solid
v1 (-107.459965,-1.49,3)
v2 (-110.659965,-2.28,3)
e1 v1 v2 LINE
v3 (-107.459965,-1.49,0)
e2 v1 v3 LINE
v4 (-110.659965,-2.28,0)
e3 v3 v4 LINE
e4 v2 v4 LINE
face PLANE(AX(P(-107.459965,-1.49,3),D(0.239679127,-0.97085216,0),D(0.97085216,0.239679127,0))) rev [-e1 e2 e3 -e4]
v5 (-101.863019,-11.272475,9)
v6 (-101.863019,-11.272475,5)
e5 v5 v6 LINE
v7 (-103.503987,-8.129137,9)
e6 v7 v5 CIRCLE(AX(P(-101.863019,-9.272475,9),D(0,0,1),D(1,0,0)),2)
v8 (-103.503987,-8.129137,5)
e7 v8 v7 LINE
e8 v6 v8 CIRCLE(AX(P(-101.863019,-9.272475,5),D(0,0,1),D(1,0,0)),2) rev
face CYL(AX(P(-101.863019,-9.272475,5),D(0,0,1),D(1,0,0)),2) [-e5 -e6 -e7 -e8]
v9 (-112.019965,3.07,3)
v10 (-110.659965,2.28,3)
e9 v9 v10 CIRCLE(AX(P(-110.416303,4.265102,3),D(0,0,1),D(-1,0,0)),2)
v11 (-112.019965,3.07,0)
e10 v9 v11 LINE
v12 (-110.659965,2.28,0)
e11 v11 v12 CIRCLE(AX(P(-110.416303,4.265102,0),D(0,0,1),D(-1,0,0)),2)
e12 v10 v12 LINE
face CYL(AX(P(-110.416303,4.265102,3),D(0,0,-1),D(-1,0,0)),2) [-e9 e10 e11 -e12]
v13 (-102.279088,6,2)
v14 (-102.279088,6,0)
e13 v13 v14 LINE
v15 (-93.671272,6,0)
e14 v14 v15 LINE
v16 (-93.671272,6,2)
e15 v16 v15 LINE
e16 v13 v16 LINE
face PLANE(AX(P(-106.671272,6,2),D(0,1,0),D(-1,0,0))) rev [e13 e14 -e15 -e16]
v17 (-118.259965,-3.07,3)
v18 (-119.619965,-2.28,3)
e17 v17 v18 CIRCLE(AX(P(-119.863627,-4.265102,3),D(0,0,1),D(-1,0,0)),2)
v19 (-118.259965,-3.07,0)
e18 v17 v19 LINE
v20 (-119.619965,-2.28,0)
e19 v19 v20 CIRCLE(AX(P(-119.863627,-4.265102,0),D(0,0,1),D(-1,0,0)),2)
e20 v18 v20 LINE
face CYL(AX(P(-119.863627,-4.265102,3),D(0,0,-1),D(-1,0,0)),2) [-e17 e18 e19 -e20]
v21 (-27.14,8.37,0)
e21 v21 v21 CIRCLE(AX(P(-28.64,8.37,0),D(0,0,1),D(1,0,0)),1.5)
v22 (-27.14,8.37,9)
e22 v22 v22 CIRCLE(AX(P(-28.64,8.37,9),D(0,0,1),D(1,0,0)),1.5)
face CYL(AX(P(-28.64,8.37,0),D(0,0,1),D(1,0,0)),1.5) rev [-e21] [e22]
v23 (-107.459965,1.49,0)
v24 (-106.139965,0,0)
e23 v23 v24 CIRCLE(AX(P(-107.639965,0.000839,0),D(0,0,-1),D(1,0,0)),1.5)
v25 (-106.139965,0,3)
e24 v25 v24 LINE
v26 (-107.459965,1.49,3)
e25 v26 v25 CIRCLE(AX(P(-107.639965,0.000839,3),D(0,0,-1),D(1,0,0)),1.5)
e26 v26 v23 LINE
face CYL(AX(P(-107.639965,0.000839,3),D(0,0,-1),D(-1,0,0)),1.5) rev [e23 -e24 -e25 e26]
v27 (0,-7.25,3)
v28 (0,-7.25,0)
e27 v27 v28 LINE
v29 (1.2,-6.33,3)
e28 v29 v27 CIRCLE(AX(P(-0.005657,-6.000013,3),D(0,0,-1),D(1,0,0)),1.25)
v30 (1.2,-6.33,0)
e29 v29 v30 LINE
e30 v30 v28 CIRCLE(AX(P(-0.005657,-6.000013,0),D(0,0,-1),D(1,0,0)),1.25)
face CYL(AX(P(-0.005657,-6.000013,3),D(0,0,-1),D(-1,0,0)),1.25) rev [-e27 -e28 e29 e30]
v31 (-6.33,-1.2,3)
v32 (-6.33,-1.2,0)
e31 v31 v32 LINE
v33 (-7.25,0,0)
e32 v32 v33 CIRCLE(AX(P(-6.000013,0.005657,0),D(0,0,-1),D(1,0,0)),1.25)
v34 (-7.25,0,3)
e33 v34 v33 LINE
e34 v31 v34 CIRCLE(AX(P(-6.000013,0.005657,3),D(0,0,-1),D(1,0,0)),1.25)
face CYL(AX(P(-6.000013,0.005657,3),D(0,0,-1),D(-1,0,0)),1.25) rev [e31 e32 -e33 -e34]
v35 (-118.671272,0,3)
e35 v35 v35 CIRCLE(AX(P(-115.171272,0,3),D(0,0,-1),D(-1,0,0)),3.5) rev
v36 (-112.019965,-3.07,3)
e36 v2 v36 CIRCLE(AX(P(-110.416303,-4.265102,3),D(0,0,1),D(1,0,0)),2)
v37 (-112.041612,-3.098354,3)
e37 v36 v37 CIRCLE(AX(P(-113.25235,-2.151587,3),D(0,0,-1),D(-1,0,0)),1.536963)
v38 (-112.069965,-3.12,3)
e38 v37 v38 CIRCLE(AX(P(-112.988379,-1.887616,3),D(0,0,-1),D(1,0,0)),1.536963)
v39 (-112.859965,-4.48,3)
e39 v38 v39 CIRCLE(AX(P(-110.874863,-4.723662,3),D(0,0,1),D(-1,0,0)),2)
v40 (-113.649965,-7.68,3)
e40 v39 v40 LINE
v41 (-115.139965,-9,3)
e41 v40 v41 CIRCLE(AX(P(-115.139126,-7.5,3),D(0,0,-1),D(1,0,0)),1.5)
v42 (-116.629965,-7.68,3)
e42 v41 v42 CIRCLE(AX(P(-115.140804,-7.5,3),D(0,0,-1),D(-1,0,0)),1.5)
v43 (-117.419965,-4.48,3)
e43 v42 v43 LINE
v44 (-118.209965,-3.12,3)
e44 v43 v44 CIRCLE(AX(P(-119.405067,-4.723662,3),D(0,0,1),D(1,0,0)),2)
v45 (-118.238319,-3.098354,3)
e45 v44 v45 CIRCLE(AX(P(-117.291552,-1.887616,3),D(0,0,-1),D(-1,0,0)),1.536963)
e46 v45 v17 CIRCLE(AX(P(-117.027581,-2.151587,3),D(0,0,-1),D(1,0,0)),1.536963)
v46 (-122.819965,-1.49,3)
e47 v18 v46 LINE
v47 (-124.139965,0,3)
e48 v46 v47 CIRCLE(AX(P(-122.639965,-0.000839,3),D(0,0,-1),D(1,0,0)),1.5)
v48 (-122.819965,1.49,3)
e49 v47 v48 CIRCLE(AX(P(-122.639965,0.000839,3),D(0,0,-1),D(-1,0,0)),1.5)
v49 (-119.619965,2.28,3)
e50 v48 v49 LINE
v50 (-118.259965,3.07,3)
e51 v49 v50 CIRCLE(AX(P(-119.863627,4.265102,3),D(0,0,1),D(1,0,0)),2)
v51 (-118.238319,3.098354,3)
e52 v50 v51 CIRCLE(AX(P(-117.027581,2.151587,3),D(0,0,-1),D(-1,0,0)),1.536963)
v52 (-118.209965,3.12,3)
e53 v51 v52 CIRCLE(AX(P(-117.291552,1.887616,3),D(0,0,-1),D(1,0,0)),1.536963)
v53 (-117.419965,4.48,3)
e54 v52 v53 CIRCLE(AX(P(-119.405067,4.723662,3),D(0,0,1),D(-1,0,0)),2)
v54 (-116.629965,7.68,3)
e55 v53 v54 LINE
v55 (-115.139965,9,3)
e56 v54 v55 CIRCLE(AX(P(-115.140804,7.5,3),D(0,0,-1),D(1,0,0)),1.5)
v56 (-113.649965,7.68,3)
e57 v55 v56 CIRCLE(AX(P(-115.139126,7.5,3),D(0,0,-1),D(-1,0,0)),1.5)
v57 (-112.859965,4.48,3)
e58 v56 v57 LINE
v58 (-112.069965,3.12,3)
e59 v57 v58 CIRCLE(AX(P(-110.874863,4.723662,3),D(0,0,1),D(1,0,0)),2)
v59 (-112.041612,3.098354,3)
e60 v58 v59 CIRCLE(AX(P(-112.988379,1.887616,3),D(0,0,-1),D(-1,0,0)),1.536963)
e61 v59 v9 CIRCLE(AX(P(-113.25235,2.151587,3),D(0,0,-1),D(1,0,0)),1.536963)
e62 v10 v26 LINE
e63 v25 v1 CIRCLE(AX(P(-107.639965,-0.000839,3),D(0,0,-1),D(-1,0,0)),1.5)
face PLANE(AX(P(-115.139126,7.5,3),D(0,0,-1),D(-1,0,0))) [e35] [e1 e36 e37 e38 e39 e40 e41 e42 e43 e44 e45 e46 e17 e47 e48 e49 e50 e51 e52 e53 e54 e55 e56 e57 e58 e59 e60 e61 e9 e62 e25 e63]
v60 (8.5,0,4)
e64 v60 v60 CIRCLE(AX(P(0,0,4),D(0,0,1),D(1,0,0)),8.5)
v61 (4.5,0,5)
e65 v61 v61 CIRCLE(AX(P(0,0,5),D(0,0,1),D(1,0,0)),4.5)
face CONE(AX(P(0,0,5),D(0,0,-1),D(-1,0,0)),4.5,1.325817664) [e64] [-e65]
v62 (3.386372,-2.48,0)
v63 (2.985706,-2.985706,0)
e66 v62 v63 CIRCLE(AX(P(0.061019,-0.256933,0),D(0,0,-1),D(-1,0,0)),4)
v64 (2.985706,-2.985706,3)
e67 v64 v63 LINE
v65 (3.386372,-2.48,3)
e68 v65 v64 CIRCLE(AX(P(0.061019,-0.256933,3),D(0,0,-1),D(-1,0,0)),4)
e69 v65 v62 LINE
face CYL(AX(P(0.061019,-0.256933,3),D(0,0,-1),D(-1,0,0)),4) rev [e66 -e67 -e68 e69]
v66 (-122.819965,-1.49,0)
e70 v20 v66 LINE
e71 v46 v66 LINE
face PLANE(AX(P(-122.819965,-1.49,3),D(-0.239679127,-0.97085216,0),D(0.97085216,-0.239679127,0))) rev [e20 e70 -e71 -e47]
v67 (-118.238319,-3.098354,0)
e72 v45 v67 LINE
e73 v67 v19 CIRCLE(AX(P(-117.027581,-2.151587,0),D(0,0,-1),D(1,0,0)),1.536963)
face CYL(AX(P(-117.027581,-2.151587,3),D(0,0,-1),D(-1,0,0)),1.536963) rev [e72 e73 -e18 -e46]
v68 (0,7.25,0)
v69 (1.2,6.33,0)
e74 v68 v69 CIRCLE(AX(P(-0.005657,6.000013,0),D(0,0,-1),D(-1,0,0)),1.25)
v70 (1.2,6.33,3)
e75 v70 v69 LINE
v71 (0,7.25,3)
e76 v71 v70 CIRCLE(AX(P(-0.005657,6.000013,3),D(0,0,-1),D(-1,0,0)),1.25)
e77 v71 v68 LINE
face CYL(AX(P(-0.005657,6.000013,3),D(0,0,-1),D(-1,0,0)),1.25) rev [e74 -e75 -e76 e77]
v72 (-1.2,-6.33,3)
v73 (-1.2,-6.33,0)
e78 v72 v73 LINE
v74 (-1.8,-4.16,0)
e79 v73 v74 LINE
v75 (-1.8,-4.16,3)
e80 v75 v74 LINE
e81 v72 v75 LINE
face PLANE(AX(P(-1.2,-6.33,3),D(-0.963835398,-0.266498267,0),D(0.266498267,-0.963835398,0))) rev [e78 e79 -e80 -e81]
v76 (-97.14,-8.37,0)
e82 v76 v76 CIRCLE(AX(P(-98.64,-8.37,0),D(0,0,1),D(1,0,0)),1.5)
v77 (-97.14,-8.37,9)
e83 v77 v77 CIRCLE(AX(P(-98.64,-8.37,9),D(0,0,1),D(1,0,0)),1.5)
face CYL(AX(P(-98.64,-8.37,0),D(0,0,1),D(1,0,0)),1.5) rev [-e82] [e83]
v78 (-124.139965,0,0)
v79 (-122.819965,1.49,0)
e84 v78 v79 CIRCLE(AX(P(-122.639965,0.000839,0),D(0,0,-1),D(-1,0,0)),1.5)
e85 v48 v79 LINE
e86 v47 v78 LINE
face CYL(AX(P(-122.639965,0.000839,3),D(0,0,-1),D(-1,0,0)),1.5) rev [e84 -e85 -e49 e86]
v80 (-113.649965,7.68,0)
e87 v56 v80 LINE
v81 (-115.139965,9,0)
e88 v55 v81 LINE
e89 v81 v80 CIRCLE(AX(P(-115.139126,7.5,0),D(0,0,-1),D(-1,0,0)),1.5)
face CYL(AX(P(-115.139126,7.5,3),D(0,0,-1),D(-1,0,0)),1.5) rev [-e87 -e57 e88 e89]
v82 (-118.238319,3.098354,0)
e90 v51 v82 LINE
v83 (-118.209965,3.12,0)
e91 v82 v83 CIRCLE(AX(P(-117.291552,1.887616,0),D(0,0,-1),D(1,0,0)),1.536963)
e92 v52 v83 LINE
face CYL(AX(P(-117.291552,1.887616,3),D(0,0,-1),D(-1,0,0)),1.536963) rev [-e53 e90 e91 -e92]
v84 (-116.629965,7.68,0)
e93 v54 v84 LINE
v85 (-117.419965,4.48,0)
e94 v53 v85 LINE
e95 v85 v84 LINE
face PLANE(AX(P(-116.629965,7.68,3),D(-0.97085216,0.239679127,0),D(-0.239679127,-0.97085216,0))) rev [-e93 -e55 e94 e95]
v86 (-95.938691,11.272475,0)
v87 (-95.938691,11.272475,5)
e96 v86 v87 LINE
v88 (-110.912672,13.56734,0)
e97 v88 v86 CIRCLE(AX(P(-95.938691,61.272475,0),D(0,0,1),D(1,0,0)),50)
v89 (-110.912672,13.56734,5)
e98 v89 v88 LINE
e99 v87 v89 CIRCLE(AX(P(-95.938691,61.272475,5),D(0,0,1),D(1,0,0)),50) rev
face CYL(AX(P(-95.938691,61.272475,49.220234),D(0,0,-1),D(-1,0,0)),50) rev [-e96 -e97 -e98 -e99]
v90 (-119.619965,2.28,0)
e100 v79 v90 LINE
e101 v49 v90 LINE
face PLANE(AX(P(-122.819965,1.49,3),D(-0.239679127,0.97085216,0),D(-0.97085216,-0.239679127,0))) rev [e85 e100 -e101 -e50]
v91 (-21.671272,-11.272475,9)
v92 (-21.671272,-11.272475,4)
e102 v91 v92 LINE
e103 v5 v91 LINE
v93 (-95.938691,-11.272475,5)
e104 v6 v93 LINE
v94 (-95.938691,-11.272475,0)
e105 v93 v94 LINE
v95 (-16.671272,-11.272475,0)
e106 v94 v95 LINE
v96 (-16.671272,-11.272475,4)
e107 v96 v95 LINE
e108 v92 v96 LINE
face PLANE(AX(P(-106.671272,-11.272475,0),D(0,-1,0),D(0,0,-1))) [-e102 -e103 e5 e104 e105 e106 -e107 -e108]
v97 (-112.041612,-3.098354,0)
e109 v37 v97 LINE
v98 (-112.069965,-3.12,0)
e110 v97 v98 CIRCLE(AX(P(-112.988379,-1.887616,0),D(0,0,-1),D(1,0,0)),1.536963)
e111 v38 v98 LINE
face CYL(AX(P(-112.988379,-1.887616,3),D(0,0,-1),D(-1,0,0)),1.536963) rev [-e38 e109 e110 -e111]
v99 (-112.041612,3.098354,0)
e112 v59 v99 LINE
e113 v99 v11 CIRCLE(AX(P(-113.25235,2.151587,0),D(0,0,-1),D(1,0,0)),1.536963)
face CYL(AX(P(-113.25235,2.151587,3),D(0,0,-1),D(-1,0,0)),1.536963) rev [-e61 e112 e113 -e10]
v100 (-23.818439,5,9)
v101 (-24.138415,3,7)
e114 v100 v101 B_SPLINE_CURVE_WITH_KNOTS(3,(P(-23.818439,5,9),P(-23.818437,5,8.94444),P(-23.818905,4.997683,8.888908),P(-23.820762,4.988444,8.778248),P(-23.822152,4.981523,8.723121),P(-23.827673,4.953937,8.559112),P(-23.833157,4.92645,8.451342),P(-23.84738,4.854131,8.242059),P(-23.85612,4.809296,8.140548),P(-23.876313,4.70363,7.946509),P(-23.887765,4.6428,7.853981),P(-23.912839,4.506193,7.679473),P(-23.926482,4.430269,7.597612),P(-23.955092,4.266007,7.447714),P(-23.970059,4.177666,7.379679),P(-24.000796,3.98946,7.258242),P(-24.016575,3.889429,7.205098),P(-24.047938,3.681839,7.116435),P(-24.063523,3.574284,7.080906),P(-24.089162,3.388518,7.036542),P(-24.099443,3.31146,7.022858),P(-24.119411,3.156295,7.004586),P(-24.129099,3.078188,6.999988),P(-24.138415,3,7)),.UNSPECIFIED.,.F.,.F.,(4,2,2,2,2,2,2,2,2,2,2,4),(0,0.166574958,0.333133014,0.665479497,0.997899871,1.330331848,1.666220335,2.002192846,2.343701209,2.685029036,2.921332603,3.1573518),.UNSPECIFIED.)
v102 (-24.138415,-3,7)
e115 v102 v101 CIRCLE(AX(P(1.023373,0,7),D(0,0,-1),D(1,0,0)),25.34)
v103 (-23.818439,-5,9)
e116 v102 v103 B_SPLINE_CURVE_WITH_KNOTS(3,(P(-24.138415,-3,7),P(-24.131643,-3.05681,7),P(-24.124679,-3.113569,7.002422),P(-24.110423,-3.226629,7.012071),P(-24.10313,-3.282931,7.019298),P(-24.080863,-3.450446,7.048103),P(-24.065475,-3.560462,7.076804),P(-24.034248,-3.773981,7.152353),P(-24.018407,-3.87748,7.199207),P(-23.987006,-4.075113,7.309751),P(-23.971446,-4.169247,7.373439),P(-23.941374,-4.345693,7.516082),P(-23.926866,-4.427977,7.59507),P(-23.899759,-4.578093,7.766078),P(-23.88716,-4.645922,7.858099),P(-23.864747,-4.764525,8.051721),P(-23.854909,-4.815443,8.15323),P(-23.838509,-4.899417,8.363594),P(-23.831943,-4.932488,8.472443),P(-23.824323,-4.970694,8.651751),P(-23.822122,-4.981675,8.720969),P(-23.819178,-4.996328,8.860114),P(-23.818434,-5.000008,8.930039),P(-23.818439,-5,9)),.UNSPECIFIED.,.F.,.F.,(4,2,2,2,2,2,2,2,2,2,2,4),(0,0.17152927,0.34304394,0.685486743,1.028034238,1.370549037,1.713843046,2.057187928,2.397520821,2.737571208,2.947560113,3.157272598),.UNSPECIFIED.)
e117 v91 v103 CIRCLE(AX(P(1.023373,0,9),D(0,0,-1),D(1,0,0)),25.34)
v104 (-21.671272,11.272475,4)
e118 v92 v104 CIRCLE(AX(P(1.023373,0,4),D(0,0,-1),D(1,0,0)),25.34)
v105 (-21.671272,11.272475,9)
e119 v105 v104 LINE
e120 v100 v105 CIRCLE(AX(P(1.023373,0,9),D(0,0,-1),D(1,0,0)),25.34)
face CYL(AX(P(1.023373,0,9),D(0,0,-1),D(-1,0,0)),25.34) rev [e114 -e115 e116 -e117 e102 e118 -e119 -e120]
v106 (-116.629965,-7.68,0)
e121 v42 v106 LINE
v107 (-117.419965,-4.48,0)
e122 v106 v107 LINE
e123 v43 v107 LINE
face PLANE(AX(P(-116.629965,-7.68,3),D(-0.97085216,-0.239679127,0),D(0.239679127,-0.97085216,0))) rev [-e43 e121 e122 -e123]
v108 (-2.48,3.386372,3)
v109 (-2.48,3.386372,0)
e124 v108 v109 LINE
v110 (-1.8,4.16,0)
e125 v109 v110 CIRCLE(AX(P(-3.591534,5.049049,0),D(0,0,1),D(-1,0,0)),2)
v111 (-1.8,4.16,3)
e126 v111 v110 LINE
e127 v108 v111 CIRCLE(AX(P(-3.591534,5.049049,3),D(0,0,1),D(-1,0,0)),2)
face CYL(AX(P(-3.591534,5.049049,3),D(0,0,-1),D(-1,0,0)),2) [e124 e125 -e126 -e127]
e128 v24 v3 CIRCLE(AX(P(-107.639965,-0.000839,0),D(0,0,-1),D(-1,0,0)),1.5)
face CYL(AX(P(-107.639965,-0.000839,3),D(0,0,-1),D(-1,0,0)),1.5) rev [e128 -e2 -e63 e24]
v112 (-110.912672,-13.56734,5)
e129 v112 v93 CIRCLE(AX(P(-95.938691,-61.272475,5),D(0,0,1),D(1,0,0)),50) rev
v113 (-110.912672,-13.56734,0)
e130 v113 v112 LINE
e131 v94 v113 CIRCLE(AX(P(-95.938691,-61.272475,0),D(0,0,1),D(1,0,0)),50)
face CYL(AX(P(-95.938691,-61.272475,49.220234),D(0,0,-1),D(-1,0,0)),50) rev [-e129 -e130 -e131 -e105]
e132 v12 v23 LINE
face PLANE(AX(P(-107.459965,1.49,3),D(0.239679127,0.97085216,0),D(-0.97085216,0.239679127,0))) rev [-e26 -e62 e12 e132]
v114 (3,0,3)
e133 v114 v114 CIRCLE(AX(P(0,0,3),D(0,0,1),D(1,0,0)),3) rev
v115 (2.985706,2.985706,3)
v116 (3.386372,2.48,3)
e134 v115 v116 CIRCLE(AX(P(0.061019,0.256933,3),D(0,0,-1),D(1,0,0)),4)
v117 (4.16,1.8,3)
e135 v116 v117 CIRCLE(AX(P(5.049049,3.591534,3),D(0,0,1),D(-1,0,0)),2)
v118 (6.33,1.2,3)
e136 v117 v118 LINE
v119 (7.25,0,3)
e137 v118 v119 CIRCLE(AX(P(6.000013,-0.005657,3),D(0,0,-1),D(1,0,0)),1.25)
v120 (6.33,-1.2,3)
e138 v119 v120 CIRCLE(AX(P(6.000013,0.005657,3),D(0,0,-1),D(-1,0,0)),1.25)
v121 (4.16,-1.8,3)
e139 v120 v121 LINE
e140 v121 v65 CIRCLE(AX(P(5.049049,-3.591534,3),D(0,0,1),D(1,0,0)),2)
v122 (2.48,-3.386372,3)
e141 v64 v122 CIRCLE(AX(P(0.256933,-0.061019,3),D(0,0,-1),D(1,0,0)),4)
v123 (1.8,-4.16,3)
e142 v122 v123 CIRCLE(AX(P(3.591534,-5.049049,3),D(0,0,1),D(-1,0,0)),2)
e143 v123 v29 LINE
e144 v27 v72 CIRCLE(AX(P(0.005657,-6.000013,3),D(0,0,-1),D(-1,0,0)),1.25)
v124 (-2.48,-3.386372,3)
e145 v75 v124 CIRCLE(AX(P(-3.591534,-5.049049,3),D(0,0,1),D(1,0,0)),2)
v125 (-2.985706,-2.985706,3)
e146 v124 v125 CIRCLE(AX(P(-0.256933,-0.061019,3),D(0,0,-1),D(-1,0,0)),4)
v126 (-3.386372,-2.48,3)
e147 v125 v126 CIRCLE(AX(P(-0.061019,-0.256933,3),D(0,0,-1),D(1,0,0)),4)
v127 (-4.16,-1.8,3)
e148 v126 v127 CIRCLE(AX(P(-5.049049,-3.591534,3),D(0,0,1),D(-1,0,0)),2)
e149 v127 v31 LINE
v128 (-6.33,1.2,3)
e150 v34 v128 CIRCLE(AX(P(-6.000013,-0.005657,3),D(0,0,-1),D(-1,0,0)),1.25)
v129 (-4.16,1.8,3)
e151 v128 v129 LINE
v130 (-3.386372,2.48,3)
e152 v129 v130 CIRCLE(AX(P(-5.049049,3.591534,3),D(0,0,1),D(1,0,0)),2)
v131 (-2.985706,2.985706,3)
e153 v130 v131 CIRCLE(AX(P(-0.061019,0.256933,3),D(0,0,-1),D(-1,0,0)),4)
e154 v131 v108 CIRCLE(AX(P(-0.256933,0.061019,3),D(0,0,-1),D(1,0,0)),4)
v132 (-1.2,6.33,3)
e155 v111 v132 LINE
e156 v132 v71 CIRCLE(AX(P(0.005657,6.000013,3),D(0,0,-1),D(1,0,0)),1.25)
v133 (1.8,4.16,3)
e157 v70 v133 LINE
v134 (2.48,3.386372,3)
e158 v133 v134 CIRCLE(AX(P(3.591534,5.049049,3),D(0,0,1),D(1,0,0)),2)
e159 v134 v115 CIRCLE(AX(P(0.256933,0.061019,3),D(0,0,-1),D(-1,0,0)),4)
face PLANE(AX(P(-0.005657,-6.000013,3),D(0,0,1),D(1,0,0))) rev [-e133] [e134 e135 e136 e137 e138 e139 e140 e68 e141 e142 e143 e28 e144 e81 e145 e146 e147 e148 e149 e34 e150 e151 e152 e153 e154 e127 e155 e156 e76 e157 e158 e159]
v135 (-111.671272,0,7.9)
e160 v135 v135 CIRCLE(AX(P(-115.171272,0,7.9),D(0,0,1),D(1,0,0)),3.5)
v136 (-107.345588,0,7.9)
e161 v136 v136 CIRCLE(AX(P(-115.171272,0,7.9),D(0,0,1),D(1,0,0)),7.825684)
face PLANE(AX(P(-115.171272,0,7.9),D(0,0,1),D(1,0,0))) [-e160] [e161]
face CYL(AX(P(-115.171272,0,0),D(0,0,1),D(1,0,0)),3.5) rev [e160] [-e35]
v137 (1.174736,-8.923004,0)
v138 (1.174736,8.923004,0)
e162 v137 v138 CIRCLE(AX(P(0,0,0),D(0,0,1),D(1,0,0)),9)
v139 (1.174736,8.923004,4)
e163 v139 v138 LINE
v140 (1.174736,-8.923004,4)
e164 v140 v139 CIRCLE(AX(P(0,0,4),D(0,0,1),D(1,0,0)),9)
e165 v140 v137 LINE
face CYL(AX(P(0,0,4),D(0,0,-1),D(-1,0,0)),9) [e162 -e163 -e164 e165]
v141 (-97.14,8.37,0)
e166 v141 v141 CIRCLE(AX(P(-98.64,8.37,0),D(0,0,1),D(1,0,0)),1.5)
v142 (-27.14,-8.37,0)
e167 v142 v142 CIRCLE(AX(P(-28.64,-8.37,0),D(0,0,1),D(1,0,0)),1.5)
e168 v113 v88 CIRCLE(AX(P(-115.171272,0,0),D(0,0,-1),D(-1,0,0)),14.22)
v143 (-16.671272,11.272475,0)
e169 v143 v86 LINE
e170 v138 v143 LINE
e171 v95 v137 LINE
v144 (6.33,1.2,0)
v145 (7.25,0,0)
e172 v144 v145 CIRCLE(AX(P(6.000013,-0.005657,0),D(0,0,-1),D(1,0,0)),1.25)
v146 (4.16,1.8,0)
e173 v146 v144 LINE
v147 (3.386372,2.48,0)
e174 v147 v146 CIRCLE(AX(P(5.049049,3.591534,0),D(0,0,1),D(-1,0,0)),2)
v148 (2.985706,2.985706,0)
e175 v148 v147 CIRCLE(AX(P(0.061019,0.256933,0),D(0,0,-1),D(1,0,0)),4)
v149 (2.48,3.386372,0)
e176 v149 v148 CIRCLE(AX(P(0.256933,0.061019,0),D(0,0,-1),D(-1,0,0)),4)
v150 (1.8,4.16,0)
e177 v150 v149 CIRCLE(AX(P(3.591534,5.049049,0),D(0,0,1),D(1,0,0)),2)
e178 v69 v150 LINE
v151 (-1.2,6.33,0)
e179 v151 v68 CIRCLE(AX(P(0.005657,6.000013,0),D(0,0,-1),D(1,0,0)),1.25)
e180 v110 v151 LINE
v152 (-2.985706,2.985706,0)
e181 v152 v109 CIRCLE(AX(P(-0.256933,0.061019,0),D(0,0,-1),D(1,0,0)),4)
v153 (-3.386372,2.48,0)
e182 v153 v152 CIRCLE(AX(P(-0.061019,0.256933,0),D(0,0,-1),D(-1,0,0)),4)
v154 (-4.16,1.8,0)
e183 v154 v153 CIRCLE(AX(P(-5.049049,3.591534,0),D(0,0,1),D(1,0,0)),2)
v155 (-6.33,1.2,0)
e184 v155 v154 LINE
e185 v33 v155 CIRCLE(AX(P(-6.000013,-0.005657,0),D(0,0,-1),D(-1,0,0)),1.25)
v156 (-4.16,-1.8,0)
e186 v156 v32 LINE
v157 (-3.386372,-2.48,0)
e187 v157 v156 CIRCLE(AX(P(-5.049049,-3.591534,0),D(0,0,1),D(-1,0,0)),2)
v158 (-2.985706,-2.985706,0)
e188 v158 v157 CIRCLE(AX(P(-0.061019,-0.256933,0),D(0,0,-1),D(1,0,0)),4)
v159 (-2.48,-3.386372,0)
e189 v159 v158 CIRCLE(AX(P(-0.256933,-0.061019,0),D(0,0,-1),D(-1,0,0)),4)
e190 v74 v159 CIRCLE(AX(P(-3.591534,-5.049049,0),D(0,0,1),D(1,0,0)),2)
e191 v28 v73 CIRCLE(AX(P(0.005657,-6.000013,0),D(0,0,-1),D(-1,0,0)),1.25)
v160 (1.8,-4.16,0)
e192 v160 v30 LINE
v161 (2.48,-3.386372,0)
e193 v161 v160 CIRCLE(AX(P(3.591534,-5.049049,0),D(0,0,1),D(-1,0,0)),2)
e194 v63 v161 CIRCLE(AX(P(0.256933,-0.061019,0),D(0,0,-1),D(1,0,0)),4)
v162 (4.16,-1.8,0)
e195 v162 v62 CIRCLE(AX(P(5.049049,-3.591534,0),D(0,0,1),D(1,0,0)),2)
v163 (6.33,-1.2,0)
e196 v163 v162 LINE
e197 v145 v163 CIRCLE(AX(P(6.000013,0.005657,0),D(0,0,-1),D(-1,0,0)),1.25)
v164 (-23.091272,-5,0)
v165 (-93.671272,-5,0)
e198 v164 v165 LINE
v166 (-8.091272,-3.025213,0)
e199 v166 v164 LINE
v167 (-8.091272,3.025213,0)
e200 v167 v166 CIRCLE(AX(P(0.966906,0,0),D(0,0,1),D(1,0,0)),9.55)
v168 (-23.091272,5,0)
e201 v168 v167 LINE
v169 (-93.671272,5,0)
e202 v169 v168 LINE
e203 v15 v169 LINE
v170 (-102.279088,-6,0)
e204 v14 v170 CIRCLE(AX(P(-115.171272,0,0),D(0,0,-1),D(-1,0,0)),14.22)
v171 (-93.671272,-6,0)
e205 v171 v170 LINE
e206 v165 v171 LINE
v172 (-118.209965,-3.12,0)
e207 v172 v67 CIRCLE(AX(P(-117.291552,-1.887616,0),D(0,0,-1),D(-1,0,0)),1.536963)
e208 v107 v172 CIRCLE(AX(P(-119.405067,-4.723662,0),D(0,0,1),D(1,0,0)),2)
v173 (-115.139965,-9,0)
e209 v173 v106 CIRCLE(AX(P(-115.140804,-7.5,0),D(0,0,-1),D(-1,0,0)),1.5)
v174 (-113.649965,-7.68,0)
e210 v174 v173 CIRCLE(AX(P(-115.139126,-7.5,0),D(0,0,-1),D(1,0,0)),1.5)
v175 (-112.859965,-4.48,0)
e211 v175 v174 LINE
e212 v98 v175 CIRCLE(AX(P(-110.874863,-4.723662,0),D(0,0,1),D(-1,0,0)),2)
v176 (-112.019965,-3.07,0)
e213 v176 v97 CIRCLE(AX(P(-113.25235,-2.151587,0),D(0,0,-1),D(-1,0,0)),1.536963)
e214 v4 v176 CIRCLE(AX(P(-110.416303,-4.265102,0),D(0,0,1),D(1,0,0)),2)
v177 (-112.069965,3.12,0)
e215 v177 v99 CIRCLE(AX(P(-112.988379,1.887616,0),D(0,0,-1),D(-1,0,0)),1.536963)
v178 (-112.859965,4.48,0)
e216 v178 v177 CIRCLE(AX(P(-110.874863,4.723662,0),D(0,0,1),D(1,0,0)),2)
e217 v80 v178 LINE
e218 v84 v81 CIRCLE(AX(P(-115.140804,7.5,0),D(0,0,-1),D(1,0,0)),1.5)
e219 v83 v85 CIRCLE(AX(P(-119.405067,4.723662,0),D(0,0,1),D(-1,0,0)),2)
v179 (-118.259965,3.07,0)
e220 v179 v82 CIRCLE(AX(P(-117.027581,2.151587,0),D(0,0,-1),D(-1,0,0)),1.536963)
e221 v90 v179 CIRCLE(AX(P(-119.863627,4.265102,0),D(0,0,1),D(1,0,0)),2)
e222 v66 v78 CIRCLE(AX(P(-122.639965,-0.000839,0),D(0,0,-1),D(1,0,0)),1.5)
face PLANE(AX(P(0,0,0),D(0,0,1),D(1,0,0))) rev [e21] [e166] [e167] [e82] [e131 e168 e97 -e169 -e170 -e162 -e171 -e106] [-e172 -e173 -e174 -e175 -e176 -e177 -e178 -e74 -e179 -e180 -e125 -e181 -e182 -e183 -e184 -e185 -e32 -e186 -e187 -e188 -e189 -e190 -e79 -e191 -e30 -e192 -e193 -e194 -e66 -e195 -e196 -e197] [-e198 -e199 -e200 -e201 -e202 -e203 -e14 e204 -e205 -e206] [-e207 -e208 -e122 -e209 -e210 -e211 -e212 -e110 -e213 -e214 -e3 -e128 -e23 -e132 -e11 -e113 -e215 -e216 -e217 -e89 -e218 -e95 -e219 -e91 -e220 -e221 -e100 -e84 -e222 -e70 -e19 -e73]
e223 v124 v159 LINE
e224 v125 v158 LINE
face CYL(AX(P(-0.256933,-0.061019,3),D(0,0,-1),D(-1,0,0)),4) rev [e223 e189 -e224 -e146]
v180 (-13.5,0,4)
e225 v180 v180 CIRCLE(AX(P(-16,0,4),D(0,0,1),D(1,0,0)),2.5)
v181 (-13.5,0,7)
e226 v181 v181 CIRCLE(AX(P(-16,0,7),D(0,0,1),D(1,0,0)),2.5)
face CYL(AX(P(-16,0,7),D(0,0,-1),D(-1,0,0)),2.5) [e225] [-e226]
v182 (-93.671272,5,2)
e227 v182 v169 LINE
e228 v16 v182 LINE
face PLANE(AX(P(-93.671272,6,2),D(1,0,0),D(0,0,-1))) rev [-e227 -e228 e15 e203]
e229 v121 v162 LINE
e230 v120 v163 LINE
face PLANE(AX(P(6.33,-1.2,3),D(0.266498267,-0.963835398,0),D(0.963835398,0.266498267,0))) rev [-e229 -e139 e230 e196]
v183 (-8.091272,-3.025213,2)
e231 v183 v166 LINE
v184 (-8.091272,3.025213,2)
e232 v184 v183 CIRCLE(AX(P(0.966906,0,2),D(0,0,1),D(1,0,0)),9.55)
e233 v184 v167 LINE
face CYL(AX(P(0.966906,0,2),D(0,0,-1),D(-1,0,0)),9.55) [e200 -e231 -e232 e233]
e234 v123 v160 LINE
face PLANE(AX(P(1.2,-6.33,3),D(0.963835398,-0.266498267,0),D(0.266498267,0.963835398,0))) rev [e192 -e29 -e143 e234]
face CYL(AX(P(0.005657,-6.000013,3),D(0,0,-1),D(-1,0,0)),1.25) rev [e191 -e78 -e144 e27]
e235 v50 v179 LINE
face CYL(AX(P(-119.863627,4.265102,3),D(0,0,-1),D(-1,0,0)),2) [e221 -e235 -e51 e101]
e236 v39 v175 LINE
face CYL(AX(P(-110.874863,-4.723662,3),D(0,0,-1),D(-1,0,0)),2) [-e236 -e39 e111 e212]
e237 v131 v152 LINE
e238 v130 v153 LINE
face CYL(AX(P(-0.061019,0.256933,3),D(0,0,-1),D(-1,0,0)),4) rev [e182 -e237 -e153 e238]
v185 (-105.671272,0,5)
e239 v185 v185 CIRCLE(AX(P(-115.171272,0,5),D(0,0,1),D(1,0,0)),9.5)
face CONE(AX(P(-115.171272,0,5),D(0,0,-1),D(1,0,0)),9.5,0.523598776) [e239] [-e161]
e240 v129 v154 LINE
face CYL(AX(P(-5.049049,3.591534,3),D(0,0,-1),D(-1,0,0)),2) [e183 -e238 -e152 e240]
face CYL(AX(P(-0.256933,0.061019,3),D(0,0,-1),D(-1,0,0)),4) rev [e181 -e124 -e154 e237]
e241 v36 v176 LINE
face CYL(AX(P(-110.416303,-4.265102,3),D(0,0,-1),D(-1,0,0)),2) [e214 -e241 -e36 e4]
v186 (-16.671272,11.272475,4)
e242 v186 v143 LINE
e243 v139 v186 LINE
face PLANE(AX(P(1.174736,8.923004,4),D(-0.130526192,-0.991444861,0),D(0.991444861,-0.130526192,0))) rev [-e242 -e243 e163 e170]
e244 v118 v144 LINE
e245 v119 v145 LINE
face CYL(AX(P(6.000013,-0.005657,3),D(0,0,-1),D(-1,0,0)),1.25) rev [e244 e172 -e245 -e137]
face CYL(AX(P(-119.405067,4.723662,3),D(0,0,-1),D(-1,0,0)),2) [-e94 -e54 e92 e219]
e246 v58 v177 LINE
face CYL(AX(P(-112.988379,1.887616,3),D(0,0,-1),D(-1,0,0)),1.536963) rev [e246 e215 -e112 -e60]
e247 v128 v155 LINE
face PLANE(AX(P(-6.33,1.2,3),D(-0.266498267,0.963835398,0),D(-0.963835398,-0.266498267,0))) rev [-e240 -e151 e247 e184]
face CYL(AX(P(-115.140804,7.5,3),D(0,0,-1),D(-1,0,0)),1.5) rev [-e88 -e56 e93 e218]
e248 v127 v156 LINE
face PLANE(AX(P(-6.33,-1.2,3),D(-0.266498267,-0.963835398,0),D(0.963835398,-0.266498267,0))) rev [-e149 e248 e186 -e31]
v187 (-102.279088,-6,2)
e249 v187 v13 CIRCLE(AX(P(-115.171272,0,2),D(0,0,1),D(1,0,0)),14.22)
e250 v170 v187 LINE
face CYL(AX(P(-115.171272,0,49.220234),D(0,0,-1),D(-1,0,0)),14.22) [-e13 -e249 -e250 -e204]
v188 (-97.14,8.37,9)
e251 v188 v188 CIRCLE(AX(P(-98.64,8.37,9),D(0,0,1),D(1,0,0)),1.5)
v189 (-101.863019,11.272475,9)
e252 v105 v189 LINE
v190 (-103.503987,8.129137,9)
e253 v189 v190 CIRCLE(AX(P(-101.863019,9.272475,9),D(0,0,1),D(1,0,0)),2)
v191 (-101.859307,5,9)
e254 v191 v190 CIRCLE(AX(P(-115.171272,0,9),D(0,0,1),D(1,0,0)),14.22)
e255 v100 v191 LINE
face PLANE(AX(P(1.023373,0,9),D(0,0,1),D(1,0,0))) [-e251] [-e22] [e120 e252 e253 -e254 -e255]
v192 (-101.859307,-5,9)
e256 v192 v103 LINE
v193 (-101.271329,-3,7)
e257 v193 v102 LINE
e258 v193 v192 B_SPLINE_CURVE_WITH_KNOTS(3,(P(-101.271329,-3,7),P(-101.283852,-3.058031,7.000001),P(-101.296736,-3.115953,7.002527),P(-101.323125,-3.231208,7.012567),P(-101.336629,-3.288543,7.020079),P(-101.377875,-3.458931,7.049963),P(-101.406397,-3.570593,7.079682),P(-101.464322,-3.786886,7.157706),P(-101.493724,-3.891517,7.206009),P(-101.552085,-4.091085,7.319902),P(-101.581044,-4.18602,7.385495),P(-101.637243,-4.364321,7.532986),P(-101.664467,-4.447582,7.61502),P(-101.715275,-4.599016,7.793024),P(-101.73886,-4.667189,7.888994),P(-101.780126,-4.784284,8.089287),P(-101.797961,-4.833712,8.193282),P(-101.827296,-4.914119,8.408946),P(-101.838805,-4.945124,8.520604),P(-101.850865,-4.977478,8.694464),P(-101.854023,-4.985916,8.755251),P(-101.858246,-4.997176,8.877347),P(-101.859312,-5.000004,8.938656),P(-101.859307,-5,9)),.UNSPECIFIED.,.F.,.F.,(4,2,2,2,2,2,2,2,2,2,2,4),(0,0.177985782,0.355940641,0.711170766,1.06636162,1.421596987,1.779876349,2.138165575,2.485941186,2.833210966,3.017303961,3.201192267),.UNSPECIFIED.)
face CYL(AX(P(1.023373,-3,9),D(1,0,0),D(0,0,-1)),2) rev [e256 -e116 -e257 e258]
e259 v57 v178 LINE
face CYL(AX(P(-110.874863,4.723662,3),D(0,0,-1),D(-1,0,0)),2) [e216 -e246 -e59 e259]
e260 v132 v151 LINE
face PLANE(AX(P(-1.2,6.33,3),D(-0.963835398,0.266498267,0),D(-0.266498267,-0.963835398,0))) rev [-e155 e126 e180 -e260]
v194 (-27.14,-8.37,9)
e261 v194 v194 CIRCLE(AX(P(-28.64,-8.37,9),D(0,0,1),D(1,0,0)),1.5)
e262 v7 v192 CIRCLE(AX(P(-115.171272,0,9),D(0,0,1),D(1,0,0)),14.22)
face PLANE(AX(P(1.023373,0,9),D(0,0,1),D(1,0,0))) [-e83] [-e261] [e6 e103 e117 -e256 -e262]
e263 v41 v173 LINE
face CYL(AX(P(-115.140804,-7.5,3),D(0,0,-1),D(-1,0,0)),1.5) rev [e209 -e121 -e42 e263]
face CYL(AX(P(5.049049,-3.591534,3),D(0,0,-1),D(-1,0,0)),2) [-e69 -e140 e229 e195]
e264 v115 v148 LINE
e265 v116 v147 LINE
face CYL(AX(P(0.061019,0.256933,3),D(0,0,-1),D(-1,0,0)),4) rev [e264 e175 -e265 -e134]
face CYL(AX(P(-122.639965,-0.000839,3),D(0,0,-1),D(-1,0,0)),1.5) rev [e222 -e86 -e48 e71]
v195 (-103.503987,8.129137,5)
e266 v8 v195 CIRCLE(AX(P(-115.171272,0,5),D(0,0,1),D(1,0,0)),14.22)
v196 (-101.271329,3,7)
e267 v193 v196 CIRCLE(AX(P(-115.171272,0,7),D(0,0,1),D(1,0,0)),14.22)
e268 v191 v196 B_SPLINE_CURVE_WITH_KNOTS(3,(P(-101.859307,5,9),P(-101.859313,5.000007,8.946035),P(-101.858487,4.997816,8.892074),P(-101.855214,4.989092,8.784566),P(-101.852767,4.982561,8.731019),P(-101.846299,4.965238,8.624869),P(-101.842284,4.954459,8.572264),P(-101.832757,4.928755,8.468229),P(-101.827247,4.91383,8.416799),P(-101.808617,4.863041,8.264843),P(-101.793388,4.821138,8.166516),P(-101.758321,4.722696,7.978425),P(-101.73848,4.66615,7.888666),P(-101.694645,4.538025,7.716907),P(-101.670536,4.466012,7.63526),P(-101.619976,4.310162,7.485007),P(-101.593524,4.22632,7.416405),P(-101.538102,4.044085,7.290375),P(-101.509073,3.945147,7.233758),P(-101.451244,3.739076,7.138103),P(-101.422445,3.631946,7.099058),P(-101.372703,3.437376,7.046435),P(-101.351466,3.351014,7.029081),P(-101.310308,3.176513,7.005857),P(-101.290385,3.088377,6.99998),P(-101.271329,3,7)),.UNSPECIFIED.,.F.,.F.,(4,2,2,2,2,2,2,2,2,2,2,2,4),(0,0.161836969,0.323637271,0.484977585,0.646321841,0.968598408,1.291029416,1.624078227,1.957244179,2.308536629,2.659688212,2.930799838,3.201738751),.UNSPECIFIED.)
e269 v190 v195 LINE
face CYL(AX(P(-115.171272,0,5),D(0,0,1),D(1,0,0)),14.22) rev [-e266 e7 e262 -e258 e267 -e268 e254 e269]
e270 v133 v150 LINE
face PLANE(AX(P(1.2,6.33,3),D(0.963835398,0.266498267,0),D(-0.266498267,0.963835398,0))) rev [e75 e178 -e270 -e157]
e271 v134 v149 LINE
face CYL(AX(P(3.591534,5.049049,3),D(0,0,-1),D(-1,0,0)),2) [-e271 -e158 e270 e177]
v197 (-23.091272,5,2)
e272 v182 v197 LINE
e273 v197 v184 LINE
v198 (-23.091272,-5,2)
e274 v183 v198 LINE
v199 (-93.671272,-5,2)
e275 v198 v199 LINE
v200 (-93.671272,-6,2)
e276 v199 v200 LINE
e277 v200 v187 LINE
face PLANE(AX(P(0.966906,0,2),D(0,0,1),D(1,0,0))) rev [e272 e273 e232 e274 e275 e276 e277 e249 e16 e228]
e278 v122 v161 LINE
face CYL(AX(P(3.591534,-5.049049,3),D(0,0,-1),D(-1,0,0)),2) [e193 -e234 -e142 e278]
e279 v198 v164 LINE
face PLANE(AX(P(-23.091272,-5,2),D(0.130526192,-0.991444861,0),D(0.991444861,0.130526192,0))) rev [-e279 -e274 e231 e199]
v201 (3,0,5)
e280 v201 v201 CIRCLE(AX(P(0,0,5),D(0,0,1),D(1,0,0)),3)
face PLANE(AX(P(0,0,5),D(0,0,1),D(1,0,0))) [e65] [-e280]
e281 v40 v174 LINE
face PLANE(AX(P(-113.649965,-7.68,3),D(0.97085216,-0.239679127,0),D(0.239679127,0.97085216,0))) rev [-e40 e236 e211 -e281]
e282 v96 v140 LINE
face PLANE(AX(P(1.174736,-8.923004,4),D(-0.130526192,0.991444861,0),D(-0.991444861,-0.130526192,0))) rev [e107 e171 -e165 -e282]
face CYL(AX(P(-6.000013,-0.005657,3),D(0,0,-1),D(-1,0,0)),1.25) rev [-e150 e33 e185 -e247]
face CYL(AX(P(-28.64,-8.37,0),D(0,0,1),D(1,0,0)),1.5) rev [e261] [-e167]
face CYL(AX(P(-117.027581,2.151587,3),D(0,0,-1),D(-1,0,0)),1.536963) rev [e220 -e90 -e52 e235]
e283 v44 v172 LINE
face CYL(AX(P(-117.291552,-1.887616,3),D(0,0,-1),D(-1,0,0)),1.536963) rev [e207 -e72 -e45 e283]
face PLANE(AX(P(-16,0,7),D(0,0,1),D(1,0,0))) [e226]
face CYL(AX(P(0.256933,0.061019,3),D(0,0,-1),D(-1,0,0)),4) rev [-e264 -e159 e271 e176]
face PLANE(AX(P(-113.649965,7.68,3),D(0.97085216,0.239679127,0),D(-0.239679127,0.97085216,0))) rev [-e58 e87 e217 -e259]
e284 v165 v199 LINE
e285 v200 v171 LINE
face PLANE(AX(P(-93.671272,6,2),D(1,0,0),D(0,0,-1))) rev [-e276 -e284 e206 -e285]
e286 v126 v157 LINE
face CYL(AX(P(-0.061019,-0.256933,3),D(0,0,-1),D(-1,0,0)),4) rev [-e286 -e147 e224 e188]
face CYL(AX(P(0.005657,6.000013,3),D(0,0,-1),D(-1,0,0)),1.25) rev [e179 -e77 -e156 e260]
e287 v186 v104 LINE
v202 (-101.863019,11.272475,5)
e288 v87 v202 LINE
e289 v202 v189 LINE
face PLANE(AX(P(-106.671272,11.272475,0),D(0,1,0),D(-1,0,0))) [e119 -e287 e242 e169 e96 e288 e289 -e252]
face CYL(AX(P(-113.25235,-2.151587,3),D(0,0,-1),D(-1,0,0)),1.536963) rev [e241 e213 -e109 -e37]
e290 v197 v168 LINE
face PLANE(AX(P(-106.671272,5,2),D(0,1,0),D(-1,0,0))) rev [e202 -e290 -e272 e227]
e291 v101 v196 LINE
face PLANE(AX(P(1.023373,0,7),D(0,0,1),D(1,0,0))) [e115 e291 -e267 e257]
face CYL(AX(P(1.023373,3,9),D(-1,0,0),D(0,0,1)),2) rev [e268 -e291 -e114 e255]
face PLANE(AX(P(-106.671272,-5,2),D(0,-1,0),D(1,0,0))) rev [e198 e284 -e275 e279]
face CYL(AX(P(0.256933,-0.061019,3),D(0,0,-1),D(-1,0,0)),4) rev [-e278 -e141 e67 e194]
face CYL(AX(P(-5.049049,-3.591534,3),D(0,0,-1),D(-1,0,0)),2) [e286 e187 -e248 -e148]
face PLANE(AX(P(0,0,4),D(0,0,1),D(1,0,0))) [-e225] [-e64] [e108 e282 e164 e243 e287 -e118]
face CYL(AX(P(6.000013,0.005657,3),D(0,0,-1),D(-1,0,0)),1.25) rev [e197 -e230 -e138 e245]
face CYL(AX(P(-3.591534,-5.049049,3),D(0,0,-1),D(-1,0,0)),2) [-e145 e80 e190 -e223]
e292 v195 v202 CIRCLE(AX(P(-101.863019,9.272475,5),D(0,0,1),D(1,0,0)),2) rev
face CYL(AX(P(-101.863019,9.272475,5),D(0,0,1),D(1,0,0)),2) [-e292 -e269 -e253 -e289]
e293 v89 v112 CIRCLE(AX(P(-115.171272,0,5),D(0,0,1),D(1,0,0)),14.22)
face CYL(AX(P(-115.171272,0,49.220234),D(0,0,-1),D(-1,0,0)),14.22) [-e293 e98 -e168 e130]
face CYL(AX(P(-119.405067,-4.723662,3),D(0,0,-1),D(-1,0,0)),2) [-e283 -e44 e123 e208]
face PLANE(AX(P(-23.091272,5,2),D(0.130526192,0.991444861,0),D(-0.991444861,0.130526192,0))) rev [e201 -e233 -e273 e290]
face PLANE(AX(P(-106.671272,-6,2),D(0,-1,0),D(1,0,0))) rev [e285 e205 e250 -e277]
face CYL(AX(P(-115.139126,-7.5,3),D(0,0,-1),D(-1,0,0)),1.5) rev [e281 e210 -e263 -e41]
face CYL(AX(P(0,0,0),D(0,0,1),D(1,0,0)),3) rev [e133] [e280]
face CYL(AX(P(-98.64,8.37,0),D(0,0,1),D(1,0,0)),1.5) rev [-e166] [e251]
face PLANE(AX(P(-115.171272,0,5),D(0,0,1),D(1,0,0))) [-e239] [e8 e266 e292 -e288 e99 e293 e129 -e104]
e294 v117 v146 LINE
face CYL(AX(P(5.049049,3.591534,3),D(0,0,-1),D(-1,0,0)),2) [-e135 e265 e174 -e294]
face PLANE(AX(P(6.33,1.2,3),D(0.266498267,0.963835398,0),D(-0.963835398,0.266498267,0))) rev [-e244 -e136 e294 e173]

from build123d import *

# Parameters (mm, degrees)
BOSS_EXTRUDE1_DEPTH  = 4
SKETCH2_R            = 2.5
BOSS_EXTRUDE2_DEPTH  = 3
SKETCH5_R            = 4.5
SKETCH3_R            = 8.5
SKETCH6_R            = 3
CUT_EXTRUDE1_DEPTH   = 24.456289064
SKETCH7_W            = 90
SKETCH7_H            = 22.544950424
BOSS_EXTRUDE3_DEPTH  = 4
BOSS_EXTRUDE4_DEPTH  = 5
CUT_EXTRUDE2_DEPTH   = 2
CUT_EXTRUDE3_START   = -2
CUT_EXTRUDE3_DEPTH   = 2
FILLET1_R            = 2
SKETCH12_W           = 13
SKETCH12_H           = 12
CUT_EXTRUDE4_DEPTH   = 2
BOSS_EXTRUDE9_REACH  = 109.642
SKETCH13_R           = 14.22
CUT_EXTRUDE5_START   = -4
SKETCH14_R           = 14.22
CUT_EXTRUDE5_DEPTH   = 4
FILLET2_R            = 50
FILLET3_R            = 50
FILLET4_R            = 2
SKETCH15_R           = 9.5
BOSS_EXTRUDE10_DEPTH = 2.9
BOSS_EXTRUDE10_TAPER = 30
SKETCH16_R           = 3.5
CUT_EXTRUDE6_DEPTH   = 131.409814092
SKETCH17_R           = 1.5
CUT_EXTRUDE7_DEPTH   = 131.481069935
CUT_EXTRUDE8_DEPTH   = 3
CUT_EXTRUDE9_DEPTH   = 3


with BuildPart() as part:
    # Sketch1 → Boss-Extrude1 (new body)
    with BuildSketch(Plane.XY):
        with BuildLine():
            Line((1.17473573, 8.923003752), (-16.671271775, 11.272475212))
            ThreePointArc((-16.671271775, 11.272475212), (-19.953165144, 0), (-16.671271775, -11.272475212))
            Line((-16.671271775, -11.272475212), (1.17473573, -8.923003752))
            ThreePointArc((1.17473573, -8.923003752), (9, 0), (1.17473573, 8.923003752))
        make_face()
    extrude(amount=BOSS_EXTRUDE1_DEPTH)

    # Sketch2 → Boss-Extrude2 (add)
    with BuildSketch(Plane.XY.offset(4)):
        with Locations((-16, 0)):
            Circle(SKETCH2_R)
    extrude(amount=BOSS_EXTRUDE2_DEPTH)

    # Sketch5 → Loft1 section 0
    with BuildSketch(Plane.XY.offset(5)):
        Circle(SKETCH5_R)
    # Sketch3 → Loft1 section 1
    with BuildSketch(Plane.XY.offset(4)):
        Circle(SKETCH3_R)
    loft()

    # Sketch6 → Cut-Extrude1 (cut, through all)
    with BuildSketch(Plane.XY.offset(5)):
        Circle(SKETCH6_R)
    extrude(amount=-CUT_EXTRUDE1_DEPTH, mode=Mode.SUBTRACT)

    # Sketch7 → Boss-Extrude3 (add)
    with BuildSketch(Plane.XY.offset(4)):
        with Locations((-61.671271775, 0)):
            Rectangle(SKETCH7_W, SKETCH7_H)
    extrude(amount=-BOSS_EXTRUDE3_DEPTH)

    # Sketch8 → Boss-Extrude4 (add)
    with BuildSketch(Plane.XY.offset(4)):
        with BuildLine():
            Line((-106.671271775, 11.272475212), (-21.671271775, 11.272475212))
            ThreePointArc((-21.671271775, 11.272475212), (-24.316626975, 0), (-21.671271775, -11.272475212))
            Line((-21.671271775, -11.272475212), (-106.671271775, -11.272475212))
            Line((-106.671271775, -11.272475212), (-106.671271775, 11.272475212))
        make_face()
    extrude(amount=BOSS_EXTRUDE4_DEPTH)

    # Sketch9 → Cut-Extrude2 (cut)
    with BuildSketch(Plane(origin=(0, 0, 0), x_dir=(-1, 0, 0), z_dir=(0, 0, -1))):
        with BuildLine():
            Line((23.091271775, 5), (8.091271775, 3.025212536))
            ThreePointArc((8.091271775, 3.025212536), (8.583093751, 0), (8.091271775, -3.025212536))
            Line((8.091271775, -3.025212536), (23.091271775, -5))
            Line((23.091271775, -5), (106.671271775, -5))
            Line((106.671271775, -5), (106.671271775, 5))
            Line((106.671271775, 5), (23.091271775, 5))
        make_face()
    extrude(amount=-CUT_EXTRUDE2_DEPTH, mode=Mode.SUBTRACT)

    # Sketch11 → Cut-Extrude3 (cut)
    with BuildSketch(Plane.XY.offset(9).offset(CUT_EXTRUDE3_START)):
        with BuildLine():
            Line((-106.671271775, 5), (-23.818438503, 5))
            ThreePointArc((-23.818438503, 5), (-24.316626975, 0), (-23.818438503, -5))
            Line((-23.818438503, -5), (-106.671271775, -5))
            Line((-106.671271775, -5), (-106.671271775, 5))
        make_face()
    extrude(amount=CUT_EXTRUDE3_DEPTH, mode=Mode.SUBTRACT)

    # Fillet1
    fillet1_edges = [part.edges().sort_by_distance(p)[0] for p in [
        (-65.244855139, -5, 7),
        (-65.244855139, 5, 7),
    ]]
    fillet(fillet1_edges, radius=FILLET1_R - 0.0001)  # a hair under: the kernel refuses the full size

    # Sketch12 → Cut-Extrude4 (cut)
    with BuildSketch(Plane(origin=(0, 0, 0), x_dir=(-1, 0, 0), z_dir=(0, 0, -1))):
        with Locations((100.171271775, 0)):
            Rectangle(SKETCH12_W, SKETCH12_H)
    extrude(amount=-CUT_EXTRUDE4_DEPTH, mode=Mode.SUBTRACT)

    # Boss-Extrude9: up to this face of the body (flat: up to its plane)
    boss_extrude9_end = Plane(part.part.faces().sort_by_distance((-64.78254731, 8.149583263, 9))[0])
    # Sketch13 → Boss-Extrude9 (add, up to the picked face)
    with BuildSketch(Plane(origin=(0, 0, 0), x_dir=(-1, 0, 0), z_dir=(0, 0, -1)), mode=Mode.PRIVATE) as boss_extrude9_sk1:
        with Locations((115.171271775, 0)):
            Circle(SKETCH13_R)
    boss_extrude9_tool1 = split(extrude(boss_extrude9_sk1.sketch, amount=-BOSS_EXTRUDE9_REACH, mode=Mode.PRIVATE), bisect_by=boss_extrude9_end, keep=Keep.BOTH, mode=Mode.PRIVATE)
    add(boss_extrude9_tool1.solids().sort_by(Axis((-115.171272, 0, 0), (0, 0, 1)))[0])

    # Sketch14 → Cut-Extrude5 (cut)
    with BuildSketch(Plane.XY.offset(9).offset(CUT_EXTRUDE5_START)):
        with Locations((-115.171271775, 0)):
            Circle(SKETCH14_R)
    extrude(amount=CUT_EXTRUDE5_DEPTH, mode=Mode.SUBTRACT)

    # Fillet2
    fillet2_edges = [part.edges().sort_by_distance(p)[0] for p in [
        (-106.502955757, -11.272475212, 2.5),
    ]]
    fillet(fillet2_edges, radius=FILLET2_R)

    # Fillet3
    fillet3_edges = [part.edges().sort_by_distance(p)[0] for p in [
        (-106.502955757, 11.272475212, 2.5),
    ]]
    fillet(fillet3_edges, radius=FILLET3_R)

    # Fillet4
    fillet4_edges = [part.edges().sort_by_distance(p)[0] for p in [
        (-106.502955757, 11.272475212, 7),
        (-106.502955757, -11.272475212, 7),
    ]]
    fillet(fillet4_edges, radius=FILLET4_R)

    # Sketch15 → Boss-Extrude10 (add)
    with BuildSketch(Plane.XY.offset(5)):
        with Locations((-115.171271775, 0)):
            Circle(SKETCH15_R)
    extrude(amount=BOSS_EXTRUDE10_DEPTH, taper=BOSS_EXTRUDE10_TAPER)

    # Sketch16 → Cut-Extrude6 (cut, through all)
    with BuildSketch(Plane.XY.offset(7.9)):
        with Locations((-115.171271775, 0)):
            Circle(SKETCH16_R)
    extrude(amount=-CUT_EXTRUDE6_DEPTH, mode=Mode.SUBTRACT)

    # Sketch17 → Cut-Extrude7 (cut, through all)
    with BuildSketch(Plane.XY.offset(9)):
        with Locations((-98.64, 8.37)):
            Circle(SKETCH17_R)
        with Locations((-98.64, -8.37)):
            Circle(SKETCH17_R)
        with Locations((-28.64, -8.37)):
            Circle(SKETCH17_R)
        with Locations((-28.64, 8.37)):
            Circle(SKETCH17_R)
    extrude(amount=-CUT_EXTRUDE7_DEPTH, mode=Mode.SUBTRACT)

    # Sketch18 → Cut-Extrude8 (cut)
    with BuildSketch(Plane(origin=(0, 0, 0), x_dir=(-1, 0, 0), z_dir=(0, 0, -1))):
        with BuildLine():
            Line((116.629965164, -7.68), (117.419965164, -4.48))
            ThreePointArc((117.419965164, -4.48), (117.675667138, -3.719084235), (118.209965164, -3.12))
            ThreePointArc((118.209965164, -3.12), (118.224204792, -3.109259088), (118.238318816, -3.098353652))
            ThreePointArc((118.238318816, -3.098353652), (118.249224252, -3.084239628), (118.259965164, -3.07))
            ThreePointArc((118.259965164, -3.07), (118.859049399, -2.535701974), (119.619965164, -2.28))
            Line((119.619965164, -2.28), (122.819965164, -1.49))
            ThreePointArc((122.819965164, -1.49), (123.762740802, -0.995512646), (124.139965164, 0))
            ThreePointArc((124.139965164, 0), (123.762740802, 0.995512646), (122.819965164, 1.49))
            Line((122.819965164, 1.49), (119.619965164, 2.28))
            ThreePointArc((119.619965164, 2.28), (118.859049399, 2.535701974), (118.259965164, 3.07))
            ThreePointArc((118.259965164, 3.07), (118.249224252, 3.084239628), (118.238318816, 3.098353652))
            ThreePointArc((118.238318816, 3.098353652), (118.224204792, 3.109259088), (118.209965164, 3.12))
            ThreePointArc((118.209965164, 3.12), (117.675667138, 3.719084235), (117.419965164, 4.48))
            Line((117.419965164, 4.48), (116.629965164, 7.68))
            ThreePointArc((116.629965164, 7.68), (116.135477809, 8.622775638), (115.139965164, 9))
            ThreePointArc((115.139965164, 9), (114.144452518, 8.622775638), (113.649965164, 7.68))
            Line((113.649965164, 7.68), (112.859965164, 4.48))
            ThreePointArc((112.859965164, 4.48), (112.60426319, 3.719084235), (112.069965164, 3.12))
            ThreePointArc((112.069965164, 3.12), (112.055725536, 3.109259088), (112.041611512, 3.098353652))
            ThreePointArc((112.041611512, 3.098353652), (112.030706076, 3.084239628), (112.019965164, 3.07))
            ThreePointArc((112.019965164, 3.07), (111.420880929, 2.535701974), (110.659965164, 2.28))
            Line((110.659965164, 2.28), (107.459965164, 1.49))
            ThreePointArc((107.459965164, 1.49), (106.517189526, 0.995512646), (106.139965164, 0))
            ThreePointArc((106.139965164, 0), (106.517189526, -0.995512646), (107.459965164, -1.49))
            Line((107.459965164, -1.49), (110.659965164, -2.28))
            ThreePointArc((110.659965164, -2.28), (111.420880929, -2.535701974), (112.019965164, -3.07))
            ThreePointArc((112.019965164, -3.07), (112.030706076, -3.084239628), (112.041611512, -3.098353652))
            ThreePointArc((112.041611512, -3.098353652), (112.055725536, -3.109259088), (112.069965164, -3.12))
            ThreePointArc((112.069965164, -3.12), (112.60426319, -3.719084235), (112.859965164, -4.48))
            Line((112.859965164, -4.48), (113.649965164, -7.68))
            ThreePointArc((113.649965164, -7.68), (114.144452518, -8.622775638), (115.139965164, -9))
            ThreePointArc((115.139965164, -9), (116.135477809, -8.622775638), (116.629965164, -7.68))
        make_face()
    extrude(amount=-CUT_EXTRUDE8_DEPTH, mode=Mode.SUBTRACT)

    # Sketch19 → Cut-Extrude9 (cut)
    with BuildSketch(Plane(origin=(0, 0, 0), x_dir=(-1, 0, 0), z_dir=(0, 0, -1))):
        with BuildLine():
            Line((-1.2, 6.33), (-1.8, 4.16))
            ThreePointArc((-1.8, 4.16), (-2.089343599, 3.728660349), (-2.48, 3.386372183))
            ThreePointArc((-2.48, 3.386372183), (-2.740944688, 3.196252087), (-2.985706385, 2.985706385))
            ThreePointArc((-2.985706385, 2.985706385), (-3.196252087, 2.740944688), (-3.386372183, 2.48))
            ThreePointArc((-3.386372183, 2.48), (-3.728660349, 2.089343599), (-4.16, 1.8))
            Line((-4.16, 1.8), (-6.33, 1.2))
            ThreePointArc((-6.33, 1.2), (-6.992020752, 0.754882576), (-7.25, 0))
            ThreePointArc((-7.25, 0), (-6.992020752, -0.754882576), (-6.33, -1.2))
            Line((-6.33, -1.2), (-4.16, -1.8))
            ThreePointArc((-4.16, -1.8), (-3.728660349, -2.089343599), (-3.386372183, -2.48))
            ThreePointArc((-3.386372183, -2.48), (-3.196252087, -2.740944688), (-2.985706385, -2.985706385))
            ThreePointArc((-2.985706385, -2.985706385), (-2.740944688, -3.196252087), (-2.48, -3.386372183))
            ThreePointArc((-2.48, -3.386372183), (-2.089343599, -3.728660349), (-1.8, -4.16))
            Line((-1.8, -4.16), (-1.2, -6.33))
            ThreePointArc((-1.2, -6.33), (-0.754882576, -6.992020752), (0, -7.25))
            ThreePointArc((0, -7.25), (0.754882576, -6.992020752), (1.2, -6.33))
            Line((1.2, -6.33), (1.8, -4.16))
            ThreePointArc((1.8, -4.16), (2.089343599, -3.728660349), (2.48, -3.386372183))
            ThreePointArc((2.48, -3.386372183), (2.740944688, -3.196252087), (2.985706385, -2.985706385))
            ThreePointArc((2.985706385, -2.985706385), (3.196252087, -2.740944688), (3.386372183, -2.48))
            ThreePointArc((3.386372183, -2.48), (3.728660349, -2.089343599), (4.16, -1.8))
            Line((4.16, -1.8), (6.33, -1.2))
            ThreePointArc((6.33, -1.2), (6.992020752, -0.754882576), (7.25, 0))
            ThreePointArc((7.25, 0), (6.992020752, 0.754882576), (6.33, 1.2))
            Line((6.33, 1.2), (4.16, 1.8))
            ThreePointArc((4.16, 1.8), (3.728660349, 2.089343599), (3.386372183, 2.48))
            ThreePointArc((3.386372183, 2.48), (3.196252087, 2.740944688), (2.985706385, 2.985706385))
            ThreePointArc((2.985706385, 2.985706385), (2.740944688, 3.196252087), (2.48, 3.386372183))
            ThreePointArc((2.48, 3.386372183), (2.089343599, 3.728660349), (1.8, 4.16))
            Line((1.8, 4.16), (1.2, 6.33))
            ThreePointArc((1.2, 6.33), (0.754882576, 6.992020752), (0, 7.25))
            ThreePointArc((0, 7.25), (-0.754882576, 6.992020752), (-1.2, 6.33))
        make_face()
    extrude(amount=-CUT_EXTRUDE9_DEPTH, mode=Mode.SUBTRACT)


solid = part.part
